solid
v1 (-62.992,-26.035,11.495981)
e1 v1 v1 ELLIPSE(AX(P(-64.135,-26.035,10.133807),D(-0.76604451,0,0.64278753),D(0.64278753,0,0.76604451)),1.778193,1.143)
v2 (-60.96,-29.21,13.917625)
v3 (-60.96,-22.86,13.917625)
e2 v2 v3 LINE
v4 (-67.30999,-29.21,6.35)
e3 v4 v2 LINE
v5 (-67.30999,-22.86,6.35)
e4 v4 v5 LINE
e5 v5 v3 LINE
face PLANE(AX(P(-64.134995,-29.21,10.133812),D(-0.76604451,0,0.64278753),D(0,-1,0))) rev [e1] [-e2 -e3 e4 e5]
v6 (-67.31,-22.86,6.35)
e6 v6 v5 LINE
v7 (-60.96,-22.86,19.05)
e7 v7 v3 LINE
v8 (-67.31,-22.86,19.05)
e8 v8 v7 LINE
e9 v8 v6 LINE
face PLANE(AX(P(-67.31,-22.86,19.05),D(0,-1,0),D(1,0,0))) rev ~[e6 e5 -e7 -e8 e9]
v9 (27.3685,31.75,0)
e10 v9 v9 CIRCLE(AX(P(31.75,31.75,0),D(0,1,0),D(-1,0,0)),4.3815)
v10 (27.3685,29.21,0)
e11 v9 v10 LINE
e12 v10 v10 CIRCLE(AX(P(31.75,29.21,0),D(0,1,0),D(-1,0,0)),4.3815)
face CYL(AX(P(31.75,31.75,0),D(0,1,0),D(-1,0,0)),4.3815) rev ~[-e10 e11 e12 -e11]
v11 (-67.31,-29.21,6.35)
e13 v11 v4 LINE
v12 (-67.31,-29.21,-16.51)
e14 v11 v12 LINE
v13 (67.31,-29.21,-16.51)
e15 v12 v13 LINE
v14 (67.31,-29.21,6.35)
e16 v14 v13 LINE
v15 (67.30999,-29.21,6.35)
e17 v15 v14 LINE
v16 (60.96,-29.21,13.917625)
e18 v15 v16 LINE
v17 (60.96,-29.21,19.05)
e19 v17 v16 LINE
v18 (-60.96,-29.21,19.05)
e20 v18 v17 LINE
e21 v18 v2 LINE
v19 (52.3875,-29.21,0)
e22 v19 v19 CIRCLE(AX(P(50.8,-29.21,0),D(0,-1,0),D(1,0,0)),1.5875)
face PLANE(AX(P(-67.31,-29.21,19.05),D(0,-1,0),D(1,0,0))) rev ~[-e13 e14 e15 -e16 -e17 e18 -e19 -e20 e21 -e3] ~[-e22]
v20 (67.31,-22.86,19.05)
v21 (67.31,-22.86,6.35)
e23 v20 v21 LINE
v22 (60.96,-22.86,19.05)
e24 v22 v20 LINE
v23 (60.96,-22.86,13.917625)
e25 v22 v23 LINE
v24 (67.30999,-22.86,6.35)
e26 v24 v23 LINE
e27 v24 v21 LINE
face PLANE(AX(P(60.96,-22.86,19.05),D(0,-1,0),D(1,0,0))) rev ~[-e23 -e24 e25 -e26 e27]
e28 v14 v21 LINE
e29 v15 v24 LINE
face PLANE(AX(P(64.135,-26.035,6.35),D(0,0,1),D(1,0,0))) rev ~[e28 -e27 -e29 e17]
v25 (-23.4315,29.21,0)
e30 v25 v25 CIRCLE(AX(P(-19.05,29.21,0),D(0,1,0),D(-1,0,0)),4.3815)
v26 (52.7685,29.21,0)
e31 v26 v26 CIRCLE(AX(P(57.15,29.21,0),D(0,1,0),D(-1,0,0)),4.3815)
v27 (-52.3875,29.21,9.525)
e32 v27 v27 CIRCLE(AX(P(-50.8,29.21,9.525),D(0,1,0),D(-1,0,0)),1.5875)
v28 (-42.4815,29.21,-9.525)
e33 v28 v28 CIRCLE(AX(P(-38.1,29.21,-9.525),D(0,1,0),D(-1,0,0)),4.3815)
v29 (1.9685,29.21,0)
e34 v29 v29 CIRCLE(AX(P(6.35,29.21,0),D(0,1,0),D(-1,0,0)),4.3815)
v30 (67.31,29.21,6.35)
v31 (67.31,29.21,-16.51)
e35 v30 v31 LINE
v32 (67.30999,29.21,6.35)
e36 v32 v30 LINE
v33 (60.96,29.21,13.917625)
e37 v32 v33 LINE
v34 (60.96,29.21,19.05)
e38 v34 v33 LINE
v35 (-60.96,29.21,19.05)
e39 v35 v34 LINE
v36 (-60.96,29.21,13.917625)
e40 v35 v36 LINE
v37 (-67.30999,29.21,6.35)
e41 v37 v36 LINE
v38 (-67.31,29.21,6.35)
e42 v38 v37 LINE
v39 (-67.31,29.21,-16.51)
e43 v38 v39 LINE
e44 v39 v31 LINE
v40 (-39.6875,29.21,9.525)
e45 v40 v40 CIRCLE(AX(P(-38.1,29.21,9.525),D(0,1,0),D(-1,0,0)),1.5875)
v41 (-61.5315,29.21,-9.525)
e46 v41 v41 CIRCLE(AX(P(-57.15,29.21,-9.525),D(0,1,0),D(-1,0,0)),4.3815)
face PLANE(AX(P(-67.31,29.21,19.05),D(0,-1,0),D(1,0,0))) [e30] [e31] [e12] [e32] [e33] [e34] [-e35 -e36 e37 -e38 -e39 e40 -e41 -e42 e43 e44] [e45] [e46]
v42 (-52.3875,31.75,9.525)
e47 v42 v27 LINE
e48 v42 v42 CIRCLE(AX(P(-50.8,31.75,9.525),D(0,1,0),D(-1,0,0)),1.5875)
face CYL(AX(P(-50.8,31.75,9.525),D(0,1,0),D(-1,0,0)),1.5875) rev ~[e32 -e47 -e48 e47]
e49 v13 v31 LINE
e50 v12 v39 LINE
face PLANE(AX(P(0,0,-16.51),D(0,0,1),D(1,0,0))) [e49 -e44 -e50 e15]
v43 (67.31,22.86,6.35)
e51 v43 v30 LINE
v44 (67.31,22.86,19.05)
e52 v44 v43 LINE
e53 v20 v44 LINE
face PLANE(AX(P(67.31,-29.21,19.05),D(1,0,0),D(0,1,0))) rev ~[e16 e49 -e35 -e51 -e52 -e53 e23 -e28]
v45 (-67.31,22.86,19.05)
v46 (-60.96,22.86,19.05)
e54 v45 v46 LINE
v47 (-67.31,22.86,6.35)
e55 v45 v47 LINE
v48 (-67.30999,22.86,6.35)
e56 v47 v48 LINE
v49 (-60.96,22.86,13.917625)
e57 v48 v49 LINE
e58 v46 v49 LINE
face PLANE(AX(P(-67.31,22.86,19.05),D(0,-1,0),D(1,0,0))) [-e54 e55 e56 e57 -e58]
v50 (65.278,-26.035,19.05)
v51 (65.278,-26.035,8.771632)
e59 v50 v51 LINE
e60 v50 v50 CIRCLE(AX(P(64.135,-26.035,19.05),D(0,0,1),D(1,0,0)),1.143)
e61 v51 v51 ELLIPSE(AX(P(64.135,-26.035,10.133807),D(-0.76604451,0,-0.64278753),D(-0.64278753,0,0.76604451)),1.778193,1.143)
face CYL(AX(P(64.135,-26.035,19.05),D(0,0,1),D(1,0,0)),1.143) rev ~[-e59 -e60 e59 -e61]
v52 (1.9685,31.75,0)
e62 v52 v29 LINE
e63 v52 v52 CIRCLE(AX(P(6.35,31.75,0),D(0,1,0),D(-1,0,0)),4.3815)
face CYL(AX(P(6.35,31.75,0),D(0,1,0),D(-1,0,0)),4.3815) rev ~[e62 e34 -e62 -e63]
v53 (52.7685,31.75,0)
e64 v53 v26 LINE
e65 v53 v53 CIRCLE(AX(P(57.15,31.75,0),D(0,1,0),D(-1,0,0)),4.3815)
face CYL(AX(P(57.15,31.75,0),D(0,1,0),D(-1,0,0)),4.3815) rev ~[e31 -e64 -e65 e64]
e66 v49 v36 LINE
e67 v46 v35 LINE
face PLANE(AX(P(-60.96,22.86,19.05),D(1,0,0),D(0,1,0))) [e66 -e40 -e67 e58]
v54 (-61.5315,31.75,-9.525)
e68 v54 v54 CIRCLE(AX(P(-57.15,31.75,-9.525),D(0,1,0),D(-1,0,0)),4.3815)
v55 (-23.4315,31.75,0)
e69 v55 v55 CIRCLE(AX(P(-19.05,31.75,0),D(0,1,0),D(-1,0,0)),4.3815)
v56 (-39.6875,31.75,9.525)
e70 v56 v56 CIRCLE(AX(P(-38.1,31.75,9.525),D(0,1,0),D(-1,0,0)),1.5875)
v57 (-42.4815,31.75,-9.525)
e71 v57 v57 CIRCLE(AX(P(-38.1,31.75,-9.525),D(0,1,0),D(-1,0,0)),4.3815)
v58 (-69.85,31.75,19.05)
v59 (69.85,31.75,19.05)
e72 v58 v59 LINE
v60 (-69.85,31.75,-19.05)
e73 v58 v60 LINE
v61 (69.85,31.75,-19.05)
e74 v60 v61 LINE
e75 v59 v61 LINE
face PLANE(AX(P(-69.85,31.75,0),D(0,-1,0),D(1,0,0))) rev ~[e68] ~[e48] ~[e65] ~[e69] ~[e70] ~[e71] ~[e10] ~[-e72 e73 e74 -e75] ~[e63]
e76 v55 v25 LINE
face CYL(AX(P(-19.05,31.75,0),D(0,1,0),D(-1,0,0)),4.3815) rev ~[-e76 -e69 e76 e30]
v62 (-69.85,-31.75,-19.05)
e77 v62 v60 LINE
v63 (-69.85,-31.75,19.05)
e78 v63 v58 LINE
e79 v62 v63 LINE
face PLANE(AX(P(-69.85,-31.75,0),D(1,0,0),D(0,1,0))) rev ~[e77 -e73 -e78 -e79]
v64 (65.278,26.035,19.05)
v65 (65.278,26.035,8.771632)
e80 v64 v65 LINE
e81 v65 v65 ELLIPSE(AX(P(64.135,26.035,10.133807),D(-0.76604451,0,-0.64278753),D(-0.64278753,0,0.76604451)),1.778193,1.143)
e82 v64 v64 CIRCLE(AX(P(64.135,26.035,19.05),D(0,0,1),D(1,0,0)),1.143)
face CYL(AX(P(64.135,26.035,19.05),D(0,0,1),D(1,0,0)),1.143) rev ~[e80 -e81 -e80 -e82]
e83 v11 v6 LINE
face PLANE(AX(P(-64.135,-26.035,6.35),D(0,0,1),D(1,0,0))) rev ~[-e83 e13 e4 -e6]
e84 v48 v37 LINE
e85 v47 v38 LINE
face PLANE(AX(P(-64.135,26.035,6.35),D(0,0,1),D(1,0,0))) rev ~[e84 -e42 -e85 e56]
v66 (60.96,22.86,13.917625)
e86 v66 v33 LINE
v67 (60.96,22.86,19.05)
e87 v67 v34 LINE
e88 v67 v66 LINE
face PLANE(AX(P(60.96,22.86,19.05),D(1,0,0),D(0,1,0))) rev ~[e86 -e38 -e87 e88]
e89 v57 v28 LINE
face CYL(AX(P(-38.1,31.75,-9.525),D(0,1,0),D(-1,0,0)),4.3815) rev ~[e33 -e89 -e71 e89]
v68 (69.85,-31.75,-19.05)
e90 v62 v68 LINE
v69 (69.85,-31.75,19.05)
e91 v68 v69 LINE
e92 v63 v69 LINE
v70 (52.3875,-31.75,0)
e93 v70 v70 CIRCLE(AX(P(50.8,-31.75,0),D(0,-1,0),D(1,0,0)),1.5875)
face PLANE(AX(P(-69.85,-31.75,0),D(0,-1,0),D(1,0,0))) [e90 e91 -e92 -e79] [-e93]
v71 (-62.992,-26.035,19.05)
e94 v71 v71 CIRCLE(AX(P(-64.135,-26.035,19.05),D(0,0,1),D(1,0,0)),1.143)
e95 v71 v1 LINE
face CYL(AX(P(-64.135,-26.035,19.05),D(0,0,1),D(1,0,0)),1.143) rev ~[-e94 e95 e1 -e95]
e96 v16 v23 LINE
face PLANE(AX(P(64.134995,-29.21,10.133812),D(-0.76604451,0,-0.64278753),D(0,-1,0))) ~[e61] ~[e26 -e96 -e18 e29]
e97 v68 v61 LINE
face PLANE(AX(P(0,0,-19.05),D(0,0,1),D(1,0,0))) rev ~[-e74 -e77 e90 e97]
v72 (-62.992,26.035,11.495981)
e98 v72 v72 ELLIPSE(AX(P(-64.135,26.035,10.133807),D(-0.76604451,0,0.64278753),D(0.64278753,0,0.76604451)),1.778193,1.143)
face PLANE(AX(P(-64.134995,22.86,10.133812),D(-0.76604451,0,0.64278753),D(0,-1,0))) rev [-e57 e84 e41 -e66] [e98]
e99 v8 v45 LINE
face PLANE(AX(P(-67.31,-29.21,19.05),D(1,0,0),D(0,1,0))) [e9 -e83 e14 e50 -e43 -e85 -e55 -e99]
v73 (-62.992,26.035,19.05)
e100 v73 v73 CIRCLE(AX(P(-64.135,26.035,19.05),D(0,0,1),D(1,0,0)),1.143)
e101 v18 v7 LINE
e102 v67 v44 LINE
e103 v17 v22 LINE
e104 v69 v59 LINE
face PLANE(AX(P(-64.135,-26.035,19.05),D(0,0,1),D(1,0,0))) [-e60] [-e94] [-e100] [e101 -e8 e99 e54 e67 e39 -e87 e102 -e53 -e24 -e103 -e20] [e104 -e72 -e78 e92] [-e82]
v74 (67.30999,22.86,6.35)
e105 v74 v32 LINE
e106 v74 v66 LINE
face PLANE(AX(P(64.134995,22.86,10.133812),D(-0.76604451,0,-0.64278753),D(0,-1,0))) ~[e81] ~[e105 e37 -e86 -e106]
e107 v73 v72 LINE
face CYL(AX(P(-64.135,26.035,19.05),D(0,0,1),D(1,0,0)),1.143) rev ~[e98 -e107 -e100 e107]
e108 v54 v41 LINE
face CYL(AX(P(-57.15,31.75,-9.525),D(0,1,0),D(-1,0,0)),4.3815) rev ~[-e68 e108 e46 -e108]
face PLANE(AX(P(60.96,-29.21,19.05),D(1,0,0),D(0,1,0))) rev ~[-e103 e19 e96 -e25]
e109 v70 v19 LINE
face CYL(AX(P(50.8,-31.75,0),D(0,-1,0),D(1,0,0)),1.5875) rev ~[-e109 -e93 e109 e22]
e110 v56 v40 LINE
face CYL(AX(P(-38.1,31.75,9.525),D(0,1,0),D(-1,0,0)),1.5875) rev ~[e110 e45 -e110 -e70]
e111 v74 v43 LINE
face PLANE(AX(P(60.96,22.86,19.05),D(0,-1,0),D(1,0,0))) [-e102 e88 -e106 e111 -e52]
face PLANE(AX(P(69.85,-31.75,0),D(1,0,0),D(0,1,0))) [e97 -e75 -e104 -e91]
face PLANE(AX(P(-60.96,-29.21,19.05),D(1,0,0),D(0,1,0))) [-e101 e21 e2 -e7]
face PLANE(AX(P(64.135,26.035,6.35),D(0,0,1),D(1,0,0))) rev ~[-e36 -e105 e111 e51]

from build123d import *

# Parameters (mm, degrees)
F0_W        = 139.7
F0_H        = 63.5
F1_DEPTH    = 19.05
F2_W        = 134.62
F2_H        = 58.42
F3_DEPTH    = 35.56
F4_R        = 1.5875
F5_DEPTH    = 2.54
F6_R        = 4.3815
F6_R_2      = 1.5875
F7_DEPTH    = 2.54
F8_W        = 6.35
F8_H        = 6.35
F9_DEPTH    = 12.7
F10_SIZE2   = 7.567625
F10_SIZE    = 6.34999
F10_2_SIZE2 = 7.567625
F10_2_SIZE  = 6.34999
F11_SIZE2   = 7.567625
F11_SIZE    = 6.34999
F11_2_SIZE2 = 7.567625
F11_2_SIZE  = 6.34999
F12_R       = 1.143
F13_DEPTH   = 12.7


# Not quite as in the source:
# - a fillet or chamfer is up to 0.001 mm smaller than in the source, because OpenCascade refuses the exact size


with BuildPart() as f1:
    # F0 (on Top) → F1 (new body, symmetric)
    with BuildSketch(Plane.XY):
        Rectangle(F0_W, F0_H)
    extrude(amount=F1_DEPTH, both=True)

    # F2 (on face) → F3 (cut)
    with BuildSketch(Plane.XY.offset(19.05)):
        Rectangle(F2_W, F2_H)
    extrude(amount=-F3_DEPTH, mode=Mode.SUBTRACT)

    # F4 (on face) → F5 (cut, through all)
    with BuildSketch(Plane.XZ.offset(31.75)):
        with Locations((50.8, 0)):
            Circle(F4_R)
    extrude(amount=-F5_DEPTH, mode=Mode.SUBTRACT)

    # F6 (on face) → F7 (cut, through all)
    with BuildSketch(Plane(origin=(0, 31.75, 0), x_dir=(-1, 0, 0), z_dir=(0, 1, 0))):
        with Locations((-31.75, 0)):
            Circle(F6_R)
        with Locations((-6.35, 0)):
            Circle(F6_R)
        with Locations((19.05, 0)):
            Circle(F6_R)
        with Locations((50.8, 9.525)):
            Circle(F6_R_2)
        with Locations((38.1, 9.525)):
            Circle(F6_R_2)
        with Locations((57.15, -9.525)):
            Circle(F6_R)
        with Locations((38.1, -9.525)):
            Circle(F6_R)
        with Locations((-57.15, 0)):
            Circle(F6_R)
    extrude(amount=-F7_DEPTH, mode=Mode.SUBTRACT)

    # F8 (on face) → F9 (join)
    with BuildSketch(Plane.XY.offset(19.05)):
        with Locations((-64.135, -26.035)):
            Rectangle(F8_W, F8_H)
        with Locations((64.135, 26.035)):
            Rectangle(F8_W, F8_H)
        with Locations((64.135, -26.035)):
            Rectangle(F8_W, F8_H)
        with Locations((-64.135, 26.035)):
            Rectangle(F8_W, F8_H)
    extrude(amount=-F9_DEPTH)

    # F10 (size 6.35 and 7.567635313 in the source; OpenCascade refuses exactly that, so slightly less here)
    f10_edges = [f1.edges().sort_by_distance(p)[0] for p in [
        (-60.96, 26.035, 6.35),
    ]]
    f10_side = f1.faces().sort_by_distance((-64.135, 26.035, 6.35))[0]
    chamfer(f10_edges, length=F10_SIZE, length2=F10_SIZE2, reference=f10_side)

    # F10#2 (size 6.35 and 7.567635313 in the source; OpenCascade refuses exactly that, so slightly less here)
    f10_2_edges = [f1.edges().sort_by_distance(p)[0] for p in [
        (60.96, -26.035, 6.35),
    ]]
    f10_2_side = f1.faces().sort_by_distance((64.135, -26.035, 6.35))[0]
    chamfer(f10_2_edges, length=F10_2_SIZE, length2=F10_2_SIZE2, reference=f10_2_side)

    # F11 (size 6.35 and 7.567635313 in the source; OpenCascade refuses exactly that, so slightly less here)
    f11_edges = [f1.edges().sort_by_distance(p)[0] for p in [
        (60.96, 26.035, 6.35),
    ]]
    f11_side = f1.faces().sort_by_distance((64.135, 26.035, 6.35))[0]
    chamfer(f11_edges, length=F11_SIZE, length2=F11_SIZE2, reference=f11_side)

    # F11#2 (size 6.35 and 7.567635313 in the source; OpenCascade refuses exactly that, so slightly less here)
    f11_2_edges = [f1.edges().sort_by_distance(p)[0] for p in [
        (-60.96, -26.035, 6.35),
    ]]
    f11_2_side = f1.faces().sort_by_distance((-64.135, -26.035, 6.35))[0]
    chamfer(f11_2_edges, length=F11_2_SIZE, length2=F11_2_SIZE2, reference=f11_2_side)

    # F12 (on face) → F13 (cut)
    with BuildSketch(Plane.XY.offset(19.05)):
        with Locations((-64.135, 26.035)):
            Circle(F12_R)
        with Locations((64.135, 26.035)):
            Circle(F12_R)
        with Locations((-64.135, -26.035)):
            Circle(F12_R)
        with Locations((64.135, -26.035)):
            Circle(F12_R)
    extrude(amount=-F13_DEPTH, mode=Mode.SUBTRACT)


solid = f1.part
